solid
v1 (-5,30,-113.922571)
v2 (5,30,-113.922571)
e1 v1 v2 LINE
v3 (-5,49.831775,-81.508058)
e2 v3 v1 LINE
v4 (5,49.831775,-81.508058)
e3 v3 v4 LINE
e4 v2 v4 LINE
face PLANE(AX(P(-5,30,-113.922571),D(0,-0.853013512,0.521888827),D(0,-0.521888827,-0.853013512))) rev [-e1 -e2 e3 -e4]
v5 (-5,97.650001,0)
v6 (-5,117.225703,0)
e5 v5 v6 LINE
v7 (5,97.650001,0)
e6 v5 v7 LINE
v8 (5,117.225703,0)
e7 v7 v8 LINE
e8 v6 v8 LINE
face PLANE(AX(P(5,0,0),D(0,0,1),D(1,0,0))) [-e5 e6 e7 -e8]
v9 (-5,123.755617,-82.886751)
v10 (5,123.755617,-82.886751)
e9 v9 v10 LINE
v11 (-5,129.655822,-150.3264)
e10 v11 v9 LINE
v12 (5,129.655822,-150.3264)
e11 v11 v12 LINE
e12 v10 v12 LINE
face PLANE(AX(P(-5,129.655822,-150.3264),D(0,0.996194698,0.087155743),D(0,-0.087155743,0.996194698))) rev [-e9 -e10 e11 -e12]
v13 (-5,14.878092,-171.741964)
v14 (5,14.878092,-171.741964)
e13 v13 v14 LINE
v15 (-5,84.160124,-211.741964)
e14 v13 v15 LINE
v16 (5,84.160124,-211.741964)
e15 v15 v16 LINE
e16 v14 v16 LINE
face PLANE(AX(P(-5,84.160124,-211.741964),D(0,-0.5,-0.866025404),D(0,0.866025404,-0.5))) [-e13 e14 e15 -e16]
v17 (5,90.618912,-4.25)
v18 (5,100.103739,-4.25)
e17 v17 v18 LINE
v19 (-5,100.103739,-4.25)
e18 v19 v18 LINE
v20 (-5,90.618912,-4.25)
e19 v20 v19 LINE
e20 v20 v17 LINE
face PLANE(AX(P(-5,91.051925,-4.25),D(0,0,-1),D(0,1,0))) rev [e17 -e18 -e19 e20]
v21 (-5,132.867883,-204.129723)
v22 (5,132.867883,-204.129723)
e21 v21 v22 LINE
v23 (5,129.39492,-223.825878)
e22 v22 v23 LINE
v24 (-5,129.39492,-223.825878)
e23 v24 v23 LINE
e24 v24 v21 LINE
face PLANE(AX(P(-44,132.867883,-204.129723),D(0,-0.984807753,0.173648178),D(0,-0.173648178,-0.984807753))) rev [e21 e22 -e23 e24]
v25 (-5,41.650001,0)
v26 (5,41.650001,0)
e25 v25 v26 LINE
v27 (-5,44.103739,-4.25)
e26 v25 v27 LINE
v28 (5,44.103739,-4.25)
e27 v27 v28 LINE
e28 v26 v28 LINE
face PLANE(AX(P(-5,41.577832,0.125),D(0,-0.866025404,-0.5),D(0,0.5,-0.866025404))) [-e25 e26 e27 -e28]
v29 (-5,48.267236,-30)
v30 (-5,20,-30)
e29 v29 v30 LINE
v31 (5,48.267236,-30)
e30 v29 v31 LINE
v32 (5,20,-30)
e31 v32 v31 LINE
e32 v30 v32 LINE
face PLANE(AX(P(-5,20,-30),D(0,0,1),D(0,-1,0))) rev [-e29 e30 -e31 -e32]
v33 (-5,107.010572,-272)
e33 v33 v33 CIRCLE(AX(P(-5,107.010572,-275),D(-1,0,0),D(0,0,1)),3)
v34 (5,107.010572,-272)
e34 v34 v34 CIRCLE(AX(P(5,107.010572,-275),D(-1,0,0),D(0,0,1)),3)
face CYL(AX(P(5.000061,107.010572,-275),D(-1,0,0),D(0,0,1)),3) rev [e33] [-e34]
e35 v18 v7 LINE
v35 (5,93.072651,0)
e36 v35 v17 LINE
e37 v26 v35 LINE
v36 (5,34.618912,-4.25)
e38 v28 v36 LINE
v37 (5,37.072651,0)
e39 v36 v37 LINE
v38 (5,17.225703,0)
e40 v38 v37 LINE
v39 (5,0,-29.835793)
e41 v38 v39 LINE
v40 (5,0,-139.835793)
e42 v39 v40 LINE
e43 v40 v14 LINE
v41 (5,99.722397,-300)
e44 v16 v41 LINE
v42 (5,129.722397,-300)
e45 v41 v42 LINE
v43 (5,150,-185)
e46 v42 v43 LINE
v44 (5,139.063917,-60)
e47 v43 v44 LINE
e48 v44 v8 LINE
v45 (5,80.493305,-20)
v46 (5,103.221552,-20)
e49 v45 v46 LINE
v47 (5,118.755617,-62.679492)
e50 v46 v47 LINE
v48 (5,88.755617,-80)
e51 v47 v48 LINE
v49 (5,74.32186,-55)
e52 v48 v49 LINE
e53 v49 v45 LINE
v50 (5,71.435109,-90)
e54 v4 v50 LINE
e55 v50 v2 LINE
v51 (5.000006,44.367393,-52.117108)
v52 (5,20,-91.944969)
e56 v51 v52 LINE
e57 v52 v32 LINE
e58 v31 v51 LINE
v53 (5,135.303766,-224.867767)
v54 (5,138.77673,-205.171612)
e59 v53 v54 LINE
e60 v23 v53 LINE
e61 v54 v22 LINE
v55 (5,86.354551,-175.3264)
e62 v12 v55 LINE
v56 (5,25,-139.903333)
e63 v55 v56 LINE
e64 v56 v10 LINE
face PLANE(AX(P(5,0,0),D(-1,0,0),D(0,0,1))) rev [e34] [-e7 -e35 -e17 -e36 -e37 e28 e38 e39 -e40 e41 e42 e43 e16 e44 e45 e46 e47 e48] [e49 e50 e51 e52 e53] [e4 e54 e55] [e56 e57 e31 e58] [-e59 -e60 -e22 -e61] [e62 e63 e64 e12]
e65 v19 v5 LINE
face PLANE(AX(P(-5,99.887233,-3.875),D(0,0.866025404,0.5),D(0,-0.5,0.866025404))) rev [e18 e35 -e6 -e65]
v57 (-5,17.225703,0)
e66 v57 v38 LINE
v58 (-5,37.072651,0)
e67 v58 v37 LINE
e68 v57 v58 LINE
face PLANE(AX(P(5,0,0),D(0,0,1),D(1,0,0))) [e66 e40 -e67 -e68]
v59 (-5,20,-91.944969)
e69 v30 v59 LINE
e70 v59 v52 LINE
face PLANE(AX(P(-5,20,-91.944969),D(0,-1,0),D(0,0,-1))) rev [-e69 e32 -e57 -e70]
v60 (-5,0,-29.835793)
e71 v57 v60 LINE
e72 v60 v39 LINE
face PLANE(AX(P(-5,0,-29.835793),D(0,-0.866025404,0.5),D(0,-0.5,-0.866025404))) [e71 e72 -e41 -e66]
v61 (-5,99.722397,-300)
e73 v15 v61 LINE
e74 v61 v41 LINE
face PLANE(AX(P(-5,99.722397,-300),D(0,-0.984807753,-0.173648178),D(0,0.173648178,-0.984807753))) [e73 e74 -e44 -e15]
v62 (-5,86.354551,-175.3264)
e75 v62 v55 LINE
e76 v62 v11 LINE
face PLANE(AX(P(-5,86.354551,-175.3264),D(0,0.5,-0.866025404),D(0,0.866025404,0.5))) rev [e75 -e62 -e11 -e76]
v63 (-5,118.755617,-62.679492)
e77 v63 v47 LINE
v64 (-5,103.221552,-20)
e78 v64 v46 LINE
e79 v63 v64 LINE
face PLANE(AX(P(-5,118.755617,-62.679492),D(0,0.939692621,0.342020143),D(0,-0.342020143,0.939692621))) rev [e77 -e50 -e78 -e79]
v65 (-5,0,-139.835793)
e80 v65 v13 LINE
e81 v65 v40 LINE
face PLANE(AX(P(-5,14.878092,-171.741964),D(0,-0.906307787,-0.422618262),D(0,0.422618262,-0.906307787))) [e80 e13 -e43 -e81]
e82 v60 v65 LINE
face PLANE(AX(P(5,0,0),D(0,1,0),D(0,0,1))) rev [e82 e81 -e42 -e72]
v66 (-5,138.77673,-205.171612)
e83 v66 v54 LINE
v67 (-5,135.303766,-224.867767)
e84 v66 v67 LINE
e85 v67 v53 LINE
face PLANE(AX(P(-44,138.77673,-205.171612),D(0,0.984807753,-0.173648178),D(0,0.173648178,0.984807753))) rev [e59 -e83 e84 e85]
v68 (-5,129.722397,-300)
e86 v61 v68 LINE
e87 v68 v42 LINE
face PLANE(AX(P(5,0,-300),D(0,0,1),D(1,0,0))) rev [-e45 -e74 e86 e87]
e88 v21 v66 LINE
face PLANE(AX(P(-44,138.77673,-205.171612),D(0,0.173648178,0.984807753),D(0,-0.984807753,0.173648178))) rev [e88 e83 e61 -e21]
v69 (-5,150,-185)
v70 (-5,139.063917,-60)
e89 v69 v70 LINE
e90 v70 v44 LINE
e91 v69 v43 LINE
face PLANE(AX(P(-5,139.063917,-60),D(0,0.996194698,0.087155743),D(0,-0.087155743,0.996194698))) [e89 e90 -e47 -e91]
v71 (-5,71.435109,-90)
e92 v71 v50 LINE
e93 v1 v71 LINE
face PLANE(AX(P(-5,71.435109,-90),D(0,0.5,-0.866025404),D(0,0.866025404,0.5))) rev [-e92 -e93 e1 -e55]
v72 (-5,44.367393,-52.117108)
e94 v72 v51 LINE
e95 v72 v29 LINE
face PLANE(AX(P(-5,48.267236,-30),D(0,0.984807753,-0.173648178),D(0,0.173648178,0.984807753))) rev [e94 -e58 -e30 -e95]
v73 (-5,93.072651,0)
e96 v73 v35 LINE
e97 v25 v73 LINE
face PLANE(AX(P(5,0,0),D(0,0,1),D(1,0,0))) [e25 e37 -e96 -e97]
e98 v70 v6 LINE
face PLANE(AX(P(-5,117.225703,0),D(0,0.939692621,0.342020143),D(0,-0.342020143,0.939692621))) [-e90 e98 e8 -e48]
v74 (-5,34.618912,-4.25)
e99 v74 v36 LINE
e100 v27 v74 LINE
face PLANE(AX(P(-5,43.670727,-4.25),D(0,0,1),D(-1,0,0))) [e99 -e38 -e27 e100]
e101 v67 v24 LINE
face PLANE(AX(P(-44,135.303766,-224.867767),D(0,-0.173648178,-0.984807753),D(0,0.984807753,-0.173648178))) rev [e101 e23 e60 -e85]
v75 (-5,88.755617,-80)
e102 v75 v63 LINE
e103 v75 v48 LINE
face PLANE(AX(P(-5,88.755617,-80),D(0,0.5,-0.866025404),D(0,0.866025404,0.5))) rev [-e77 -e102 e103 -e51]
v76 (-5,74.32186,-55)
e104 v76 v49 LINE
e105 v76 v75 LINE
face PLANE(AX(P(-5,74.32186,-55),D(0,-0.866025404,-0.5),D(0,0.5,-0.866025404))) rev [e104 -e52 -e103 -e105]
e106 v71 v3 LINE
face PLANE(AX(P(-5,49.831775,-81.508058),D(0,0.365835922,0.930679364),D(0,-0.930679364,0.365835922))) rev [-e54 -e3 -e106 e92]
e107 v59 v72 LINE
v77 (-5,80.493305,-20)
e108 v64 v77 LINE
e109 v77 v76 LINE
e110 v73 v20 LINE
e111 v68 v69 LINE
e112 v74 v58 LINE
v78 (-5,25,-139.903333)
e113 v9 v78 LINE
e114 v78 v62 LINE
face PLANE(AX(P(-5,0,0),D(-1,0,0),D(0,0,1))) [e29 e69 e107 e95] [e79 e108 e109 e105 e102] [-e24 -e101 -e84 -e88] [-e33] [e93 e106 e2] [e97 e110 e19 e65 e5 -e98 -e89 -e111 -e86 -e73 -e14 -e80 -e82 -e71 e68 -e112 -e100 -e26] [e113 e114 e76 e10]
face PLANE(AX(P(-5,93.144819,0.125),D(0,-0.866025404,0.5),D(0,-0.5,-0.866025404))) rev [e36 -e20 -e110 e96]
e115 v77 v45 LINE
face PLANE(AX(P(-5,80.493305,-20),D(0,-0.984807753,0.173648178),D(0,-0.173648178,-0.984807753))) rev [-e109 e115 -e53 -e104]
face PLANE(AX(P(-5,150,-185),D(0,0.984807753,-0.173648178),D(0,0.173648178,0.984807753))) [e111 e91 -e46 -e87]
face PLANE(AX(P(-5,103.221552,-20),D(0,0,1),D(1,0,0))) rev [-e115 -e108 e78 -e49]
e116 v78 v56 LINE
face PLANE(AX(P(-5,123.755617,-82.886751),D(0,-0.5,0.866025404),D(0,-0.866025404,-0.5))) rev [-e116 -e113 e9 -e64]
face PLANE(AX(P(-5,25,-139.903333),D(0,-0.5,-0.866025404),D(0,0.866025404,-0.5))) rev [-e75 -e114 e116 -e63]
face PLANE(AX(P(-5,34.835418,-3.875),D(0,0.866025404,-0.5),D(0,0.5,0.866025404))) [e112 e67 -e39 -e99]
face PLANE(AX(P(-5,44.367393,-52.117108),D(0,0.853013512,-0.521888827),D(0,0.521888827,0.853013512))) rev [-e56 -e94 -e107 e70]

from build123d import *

# Parameters (mm, degrees)
ESQUISSE1_W                  = 300
ESQUISSE1_H                  = 150
BOSS_EXTRU_1_DEPTH           = 5
ESQUISSE2_OUTSIDE_W          = 369.112
ESQUISSE2_OUTSIDE_H          = 219.112
ENL_V_MAT_EXTRU_1_DEPTH      = 5
ENL_V_MAT_EXTRU_2_DEPTH      = 336.559234711
ENL_V_MAT_EXTRU_2_DEPTH_BACK = 336.559234711
ENL_V_MAT_EXTRU_4_DEPTH      = 336.559234711
ENL_V_MAT_EXTRU_4_DEPTH_BACK = 336.559234711
ESQUISSE5_R                  = 3
ENL_V_MAT_EXTRU_5_DEPTH      = 49
EMPREINTE1_START             = -5
EMPREINTE1_DEPTH             = 10
D_PLACER_START               = -5
D_PLACER_LA_FACE1_DEPTH      = 10


# Read off the part's stored shape, not the designer's step: Empreinte1, Déplacer la face1
with BuildPart() as part:
    # Esquisse1 → Boss.-Extru.1 (new, symmetric)
    with BuildSketch(Plane(origin=(0, 0, 0), x_dir=(0, 0, -1), z_dir=(1, 0, 0))):
        with Locations((150, 75)):
            Rectangle(ESQUISSE1_W, ESQUISSE1_H)
    extrude(amount=BOSS_EXTRU_1_DEPTH, both=True)

    # Esquisse2 outside → Enlèv. mat.-Extru.1 (cut, symmetric)
    with BuildSketch(Plane(origin=(0, 0, 0), x_dir=(0, 0, -1), z_dir=(1, 0, 0))):
        with Locations((150, 75)):
            Rectangle(ESQUISSE2_OUTSIDE_W, ESQUISSE2_OUTSIDE_H)
        Polygon((0, 117.225703003), (60, 139.063917059), (185, 150), (300, 129.722397219), (300, 99.722397219), (211.741963761, 84.160124165), (171.741963761, 14.878091862), (139.835792798, 0), (29.835792798, 0), (0, 17.225703003), align=None, mode=Mode.SUBTRACT)
    extrude(amount=ENL_V_MAT_EXTRU_1_DEPTH, both=True, mode=Mode.SUBTRACT)

    # Esquisse3 → Enlèv. mat.-Extru.2 (cut, two sides: drawn at the far end of the back side and taken through both)
    with BuildSketch(Plane(origin=(5, 0, 0), x_dir=(0, 0, -1), z_dir=(1, 0, 0)).offset(-ENL_V_MAT_EXTRU_2_DEPTH_BACK)):
        Polygon((20, 103.221552239), (20, 80.493304508), (55, 74.321860183), (80, 88.755616913), (62.679491924, 118.755616913), align=None)
        Polygon((90, 71.435108837), (113.922571241, 30), (81.508057782, 49.831775443), align=None)
        Polygon((82.886751346, 123.755616913), (139.903333355, 25), (175.32640016, 86.354551467), (150.32640016, 129.655821657), align=None)
        Polygon((91.944969354, 20), (30, 20), (30, 48.267236345), (52.117107943, 44.367393479), align=None)
    extrude(amount=ENL_V_MAT_EXTRU_2_DEPTH + ENL_V_MAT_EXTRU_2_DEPTH_BACK, mode=Mode.SUBTRACT)

    # Esquisse5 → Enlèv. mat.-Extru.4 (cut, two sides: drawn at the far end of the back side and taken through both)
    with BuildSketch(Plane.ZY.offset(5).offset(-ENL_V_MAT_EXTRU_4_DEPTH_BACK)):
        with Locations((-275, 107.010571736)):
            Circle(ESQUISSE5_R)
    extrude(amount=ENL_V_MAT_EXTRU_4_DEPTH + ENL_V_MAT_EXTRU_4_DEPTH_BACK, mode=Mode.SUBTRACT)

    # Esquisse6 → Enlèv. mat.-Extru.5 (cut)
    with BuildSketch(Plane(origin=(5, 0, 0), x_dir=(0, 0, -1), z_dir=(1, 0, 0))):
        Polygon((205.171612033, 138.776729635), (224.867767093, 135.303766081), (223.825878027, 129.394919563), (204.129722967, 132.867883116), align=None)
    extrude(amount=-ENL_V_MAT_EXTRU_5_DEPTH, mode=Mode.SUBTRACT)

    # Empreinte1 outline → Empreinte1 (cut)
    with BuildSketch(Plane.YZ.offset(EMPREINTE1_START)):
        Polygon((97.361325712, 0), (93.361325712, 0), (91.051924635, -4), (99.670726788, -4), align=None)
        Polygon((35.051924635, -4), (43.670726788, -4), (41.361325712, 0), (37.361325712, 0), align=None)
    extrude(amount=EMPREINTE1_DEPTH, mode=Mode.SUBTRACT)

    # Déplacer la face1 outline → Déplacer la face1 (cut)
    with BuildSketch(Plane.YZ.offset(D_PLACER_START)):
        Polygon((93.361325712, 0), (93.072650577, 0), (90.618911933, -4.25), (100.10373949, -4.25), (97.650000846, 0), (97.361325712, 0), (99.670726788, -4), (91.051924635, -4), align=None)
        Polygon((34.618911933, -4.25), (44.10373949, -4.25), (41.650000846, 0), (41.361325712, 0), (43.670726788, -4), (35.051924635, -4), (37.361325712, 0), (37.072650577, 0), align=None)
    extrude(amount=D_PLACER_LA_FACE1_DEPTH, mode=Mode.SUBTRACT)


solid = part.part
